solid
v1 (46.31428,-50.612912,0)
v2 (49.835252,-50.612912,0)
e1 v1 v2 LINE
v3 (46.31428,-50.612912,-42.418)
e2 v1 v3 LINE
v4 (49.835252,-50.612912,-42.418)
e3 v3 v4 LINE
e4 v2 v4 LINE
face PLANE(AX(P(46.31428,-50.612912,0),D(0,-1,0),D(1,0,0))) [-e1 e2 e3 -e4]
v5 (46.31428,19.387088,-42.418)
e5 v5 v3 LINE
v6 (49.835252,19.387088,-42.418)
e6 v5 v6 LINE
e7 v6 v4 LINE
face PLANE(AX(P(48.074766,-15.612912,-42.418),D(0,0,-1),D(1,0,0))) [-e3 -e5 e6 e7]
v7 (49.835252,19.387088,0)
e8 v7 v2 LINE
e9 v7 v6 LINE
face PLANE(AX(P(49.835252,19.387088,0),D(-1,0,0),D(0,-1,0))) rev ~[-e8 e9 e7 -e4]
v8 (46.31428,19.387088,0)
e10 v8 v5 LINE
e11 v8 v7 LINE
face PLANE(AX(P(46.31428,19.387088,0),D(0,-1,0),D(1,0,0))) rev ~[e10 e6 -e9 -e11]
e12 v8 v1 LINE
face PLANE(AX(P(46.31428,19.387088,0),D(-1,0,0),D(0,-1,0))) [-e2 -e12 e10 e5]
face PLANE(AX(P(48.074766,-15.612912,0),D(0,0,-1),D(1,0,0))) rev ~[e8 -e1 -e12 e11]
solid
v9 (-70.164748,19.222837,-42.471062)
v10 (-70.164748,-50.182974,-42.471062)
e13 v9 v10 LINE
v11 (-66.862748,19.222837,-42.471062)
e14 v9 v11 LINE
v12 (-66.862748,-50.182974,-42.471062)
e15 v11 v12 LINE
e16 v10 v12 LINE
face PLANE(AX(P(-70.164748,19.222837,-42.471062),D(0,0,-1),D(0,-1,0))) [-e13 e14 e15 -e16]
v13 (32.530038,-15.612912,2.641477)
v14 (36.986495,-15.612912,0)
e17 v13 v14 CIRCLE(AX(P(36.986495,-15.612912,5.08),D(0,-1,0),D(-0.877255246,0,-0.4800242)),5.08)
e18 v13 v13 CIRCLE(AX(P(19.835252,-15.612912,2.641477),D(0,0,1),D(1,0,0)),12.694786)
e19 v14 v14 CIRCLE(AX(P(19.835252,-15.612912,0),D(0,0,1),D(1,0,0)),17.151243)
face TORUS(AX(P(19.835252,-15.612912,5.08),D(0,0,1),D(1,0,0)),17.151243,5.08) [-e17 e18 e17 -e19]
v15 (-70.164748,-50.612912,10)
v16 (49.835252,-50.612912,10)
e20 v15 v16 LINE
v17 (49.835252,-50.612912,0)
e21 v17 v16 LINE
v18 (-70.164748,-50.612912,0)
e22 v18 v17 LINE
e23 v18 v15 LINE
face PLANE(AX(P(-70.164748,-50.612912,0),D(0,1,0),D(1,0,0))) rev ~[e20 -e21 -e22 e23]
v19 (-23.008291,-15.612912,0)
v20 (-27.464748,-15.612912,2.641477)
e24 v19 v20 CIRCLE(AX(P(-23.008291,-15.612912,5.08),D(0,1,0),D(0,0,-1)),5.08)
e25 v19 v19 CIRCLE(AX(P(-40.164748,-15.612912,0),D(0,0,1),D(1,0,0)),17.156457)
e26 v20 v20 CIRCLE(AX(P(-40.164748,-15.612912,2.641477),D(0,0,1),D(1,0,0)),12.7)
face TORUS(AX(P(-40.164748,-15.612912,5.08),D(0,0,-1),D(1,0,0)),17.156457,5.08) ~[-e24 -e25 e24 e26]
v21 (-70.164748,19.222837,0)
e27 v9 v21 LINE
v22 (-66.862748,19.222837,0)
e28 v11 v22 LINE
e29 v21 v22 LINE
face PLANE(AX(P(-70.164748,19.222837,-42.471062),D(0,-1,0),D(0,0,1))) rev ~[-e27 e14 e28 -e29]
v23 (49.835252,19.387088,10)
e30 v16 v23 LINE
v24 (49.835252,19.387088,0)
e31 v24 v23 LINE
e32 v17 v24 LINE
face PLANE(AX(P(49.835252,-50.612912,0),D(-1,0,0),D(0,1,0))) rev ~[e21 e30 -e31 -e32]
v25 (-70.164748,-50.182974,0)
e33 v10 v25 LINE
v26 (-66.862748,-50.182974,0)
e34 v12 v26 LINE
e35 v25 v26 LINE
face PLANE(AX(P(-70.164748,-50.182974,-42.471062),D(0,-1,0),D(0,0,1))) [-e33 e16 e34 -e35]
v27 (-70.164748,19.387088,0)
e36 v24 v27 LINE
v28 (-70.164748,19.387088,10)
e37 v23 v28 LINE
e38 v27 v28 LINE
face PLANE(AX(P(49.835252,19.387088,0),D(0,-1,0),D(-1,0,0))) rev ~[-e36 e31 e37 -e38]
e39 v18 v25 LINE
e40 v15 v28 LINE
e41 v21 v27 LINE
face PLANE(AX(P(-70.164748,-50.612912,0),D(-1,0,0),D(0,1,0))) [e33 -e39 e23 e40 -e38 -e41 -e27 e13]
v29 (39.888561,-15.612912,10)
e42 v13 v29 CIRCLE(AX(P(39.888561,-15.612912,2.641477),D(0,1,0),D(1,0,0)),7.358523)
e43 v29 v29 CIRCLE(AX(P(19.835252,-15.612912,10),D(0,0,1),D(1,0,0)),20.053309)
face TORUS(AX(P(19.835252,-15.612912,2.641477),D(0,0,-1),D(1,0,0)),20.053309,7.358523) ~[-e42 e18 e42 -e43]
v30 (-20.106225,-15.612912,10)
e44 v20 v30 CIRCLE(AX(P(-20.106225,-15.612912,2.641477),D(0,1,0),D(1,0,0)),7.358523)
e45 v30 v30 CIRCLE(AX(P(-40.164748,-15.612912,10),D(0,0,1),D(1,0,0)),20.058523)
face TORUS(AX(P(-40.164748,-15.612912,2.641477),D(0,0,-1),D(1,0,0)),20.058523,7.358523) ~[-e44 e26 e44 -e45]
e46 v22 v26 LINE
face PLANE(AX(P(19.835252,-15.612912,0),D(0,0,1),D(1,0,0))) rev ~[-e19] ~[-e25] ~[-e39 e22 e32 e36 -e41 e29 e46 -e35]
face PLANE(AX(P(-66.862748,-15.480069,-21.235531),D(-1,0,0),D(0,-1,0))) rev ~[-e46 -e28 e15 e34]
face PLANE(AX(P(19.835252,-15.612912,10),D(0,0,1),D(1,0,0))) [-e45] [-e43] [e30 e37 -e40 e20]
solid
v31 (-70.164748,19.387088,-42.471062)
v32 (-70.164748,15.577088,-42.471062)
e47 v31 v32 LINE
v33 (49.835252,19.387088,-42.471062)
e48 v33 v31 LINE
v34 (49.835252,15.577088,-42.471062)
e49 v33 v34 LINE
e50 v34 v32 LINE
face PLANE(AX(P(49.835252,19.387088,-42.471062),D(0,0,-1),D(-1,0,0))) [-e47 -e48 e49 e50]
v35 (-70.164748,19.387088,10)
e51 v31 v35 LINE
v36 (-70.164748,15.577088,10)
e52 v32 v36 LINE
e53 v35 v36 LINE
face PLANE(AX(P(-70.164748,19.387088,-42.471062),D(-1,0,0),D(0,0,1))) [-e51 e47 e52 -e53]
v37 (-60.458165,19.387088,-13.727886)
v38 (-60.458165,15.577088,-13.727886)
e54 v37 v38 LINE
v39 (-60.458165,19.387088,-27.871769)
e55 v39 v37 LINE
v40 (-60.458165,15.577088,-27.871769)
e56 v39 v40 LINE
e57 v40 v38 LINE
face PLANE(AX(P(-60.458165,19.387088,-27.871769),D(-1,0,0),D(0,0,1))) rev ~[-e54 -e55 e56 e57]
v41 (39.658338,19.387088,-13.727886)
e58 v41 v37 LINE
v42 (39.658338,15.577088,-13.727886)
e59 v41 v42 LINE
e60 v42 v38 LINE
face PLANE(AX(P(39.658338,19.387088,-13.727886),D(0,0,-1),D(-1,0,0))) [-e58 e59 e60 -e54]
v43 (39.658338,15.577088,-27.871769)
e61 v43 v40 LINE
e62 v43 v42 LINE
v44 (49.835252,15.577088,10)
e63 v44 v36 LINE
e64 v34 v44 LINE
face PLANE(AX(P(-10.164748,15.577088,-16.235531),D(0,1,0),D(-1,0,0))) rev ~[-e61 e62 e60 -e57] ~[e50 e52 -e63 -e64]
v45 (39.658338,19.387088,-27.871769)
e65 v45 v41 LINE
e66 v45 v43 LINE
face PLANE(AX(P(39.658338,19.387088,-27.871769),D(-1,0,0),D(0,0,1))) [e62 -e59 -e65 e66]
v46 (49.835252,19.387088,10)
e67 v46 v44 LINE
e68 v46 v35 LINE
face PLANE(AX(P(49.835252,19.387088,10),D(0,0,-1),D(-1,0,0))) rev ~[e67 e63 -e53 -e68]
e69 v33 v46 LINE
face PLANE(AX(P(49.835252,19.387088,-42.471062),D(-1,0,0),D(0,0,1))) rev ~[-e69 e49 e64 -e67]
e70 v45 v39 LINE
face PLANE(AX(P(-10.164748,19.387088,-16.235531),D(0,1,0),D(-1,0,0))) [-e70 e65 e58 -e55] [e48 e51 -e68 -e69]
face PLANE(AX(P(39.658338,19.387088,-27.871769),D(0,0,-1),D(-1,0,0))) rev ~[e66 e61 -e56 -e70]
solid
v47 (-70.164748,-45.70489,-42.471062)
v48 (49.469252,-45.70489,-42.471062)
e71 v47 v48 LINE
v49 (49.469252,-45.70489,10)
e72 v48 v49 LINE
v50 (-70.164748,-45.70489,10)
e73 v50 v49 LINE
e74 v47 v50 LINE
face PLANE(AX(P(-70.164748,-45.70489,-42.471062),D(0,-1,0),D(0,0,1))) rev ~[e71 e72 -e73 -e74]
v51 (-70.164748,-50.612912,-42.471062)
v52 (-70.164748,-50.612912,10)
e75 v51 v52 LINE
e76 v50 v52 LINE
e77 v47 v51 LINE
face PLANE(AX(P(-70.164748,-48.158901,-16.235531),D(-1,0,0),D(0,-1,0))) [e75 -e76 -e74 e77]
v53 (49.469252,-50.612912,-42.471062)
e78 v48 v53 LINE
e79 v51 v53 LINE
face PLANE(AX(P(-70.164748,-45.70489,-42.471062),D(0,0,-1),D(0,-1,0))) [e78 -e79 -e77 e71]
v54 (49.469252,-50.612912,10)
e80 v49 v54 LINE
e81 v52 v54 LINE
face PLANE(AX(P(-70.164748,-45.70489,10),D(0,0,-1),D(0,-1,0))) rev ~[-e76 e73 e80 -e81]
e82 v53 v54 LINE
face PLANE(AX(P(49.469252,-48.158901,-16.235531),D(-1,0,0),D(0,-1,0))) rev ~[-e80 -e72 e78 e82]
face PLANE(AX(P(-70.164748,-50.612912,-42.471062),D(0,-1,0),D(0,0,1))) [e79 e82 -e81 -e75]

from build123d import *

# Parameters (mm, degrees)
F0_W      = 60
F0_H      = 70
F0_R      = 12.6947859899
F0_R_2    = 12.7
F1_DEPTH  = 10
F2_R      = 7.3585229381
F4_W      = 69.4058109075
F4_H      = 42.471062392
F5_DEPTH  = 3.302
F6_W      = 120
F6_H      = 52.471062392
F7_DEPTH  = 3.81
F8_W      = 3.5209719837
F8_H      = 70
F9_DEPTH  = 42.418
F10_R     = 2.2359129528
F11_DEPTH = 17.6784
F12_W     = 4.9080215394
F12_H     = 52.471062392
F13_DEPTH = 119.634
F14_W     = 100.1165024936
F14_H     = 14.1438832507
F15_DEPTH = 16.256


# Not quite as in the source:
# - a fillet or chamfer that OpenCascade refuses, or shapes differently, is made with other operations: its cross-section is extruded or revolved along the edge and cut away or added


with BuildPart() as f1:
    # F0 (on Top) → F1 (new body)
    with BuildSketch(Plane.XY):
        with Locations((19.8352524638, -15.612911582)):
            Rectangle(F0_W, F0_H)
        with Locations((19.8352524638, -15.612911582)):
            Circle(F0_R, mode=Mode.SUBTRACT)
        with Locations((-40.1647475362, -15.612911582)):
            Rectangle(F0_W, F0_H)
        with Locations((-40.1647475362, -15.612911582)):
            Circle(F0_R_2, mode=Mode.SUBTRACT)
    extrude(amount=F1_DEPTH)

    # F2
    f2_edges = [f1.edges().sort_by_distance(p)[0] for p in [
        (-52.864748, -15.612912, 10),
        (7.140466, -15.612912, 10),
    ]]
    fillet(f2_edges, radius=F2_R)

    # F3: fillet of radius 5.08 on 2 edges, made by hand

    # F3_s1 → F3_t2 (revolve, cut)
    with BuildSketch(Plane.XZ.offset(15.612911582)):
        with BuildLine():
            ThreePointArc((-23.0082908854, 0), (-25.5985325222, 0.7099830363), (-27.4647475362, 2.6414770619))
            Line((-27.4647475362, 2.6414770619), (-27.4647475362, 0))
            Line((-27.4647475362, 0), (-23.0082908854, 0))
        make_face()
    revolve(axis=Axis((-40.1647475362, -15.612911582, 0), (0, 0, 1)), mode=Mode.SUBTRACT)

    # F3_s3 → F3_t4 (revolve, cut)
    with BuildSketch(Plane.XZ.offset(15.612911582)):
        with BuildLine():
            ThreePointArc((32.5300384537, 2.6414770619), (34.3962534676, 0.7099830363), (36.9864951045, 0))
            Line((36.9864951045, 0), (32.5300384537, 0))
            Line((32.5300384537, 0), (32.5300384537, 2.6414770619))
        make_face()
    revolve(axis=Axis((19.8352524638, -15.612911582, 0), (0, 0, 1)), mode=Mode.SUBTRACT)

    # F4 (on face) → F5 (join)
    with BuildSketch(Plane(origin=(-70.1647475362, 0, 0), x_dir=(0, -1, 0), z_dir=(-1, 0, 0))):
        with Locations((15.4800685123, -21.235531196)):
            Rectangle(F4_W, F4_H)
    extrude(amount=-F5_DEPTH)

    # F10 (on face) → F11 (join)
    with BuildSketch(Plane.XZ.offset(50.612911582)):
        with Locations((-63.7861341238, 5.1306239329)):
            Circle(F10_R)
    extrude(amount=-F11_DEPTH)


with BuildPart() as f7:
    # F6 (on face) → F7 (new body)
    with BuildSketch(Plane(origin=(0, 19.387088418, 0), x_dir=(-1, 0, 0), z_dir=(0, 1, 0))):
        with Locations((10.1647475362, -16.235531196)):
            Rectangle(F6_W, F6_H)
    extrude(amount=-F7_DEPTH)

    # F14 (on face) → F15 (cut)
    with BuildSketch(Plane(origin=(0, 19.387088418, 0), x_dir=(-1, 0, 0), z_dir=(0, 1, 0))):
        with Locations((10.3999134153, -20.7998272963)):
            Rectangle(F14_W, F14_H)
    extrude(amount=-F15_DEPTH, mode=Mode.SUBTRACT)


with BuildPart() as f9:
    # F8 (on face) → F9 (new body)
    with BuildSketch(Plane(origin=(0, 0, 0), x_dir=(1, 0, 0), z_dir=(0, 0, -1))):
        with Locations((48.074766472, 15.612911582)):
            Rectangle(F8_W, F8_H)
    extrude(amount=F9_DEPTH)


with BuildPart() as f13:
    # F12 (on face) → F13 (new body)
    with BuildSketch(Plane(origin=(-70.1647475362, 0, 0), x_dir=(0, -1, 0), z_dir=(-1, 0, 0))):
        with Locations((48.1589008123, -16.235531196)):
            Rectangle(F12_W, F12_H)
    extrude(amount=-F13_DEPTH)


solid = Compound([f1.part, f7.part, f9.part, f13.part])
